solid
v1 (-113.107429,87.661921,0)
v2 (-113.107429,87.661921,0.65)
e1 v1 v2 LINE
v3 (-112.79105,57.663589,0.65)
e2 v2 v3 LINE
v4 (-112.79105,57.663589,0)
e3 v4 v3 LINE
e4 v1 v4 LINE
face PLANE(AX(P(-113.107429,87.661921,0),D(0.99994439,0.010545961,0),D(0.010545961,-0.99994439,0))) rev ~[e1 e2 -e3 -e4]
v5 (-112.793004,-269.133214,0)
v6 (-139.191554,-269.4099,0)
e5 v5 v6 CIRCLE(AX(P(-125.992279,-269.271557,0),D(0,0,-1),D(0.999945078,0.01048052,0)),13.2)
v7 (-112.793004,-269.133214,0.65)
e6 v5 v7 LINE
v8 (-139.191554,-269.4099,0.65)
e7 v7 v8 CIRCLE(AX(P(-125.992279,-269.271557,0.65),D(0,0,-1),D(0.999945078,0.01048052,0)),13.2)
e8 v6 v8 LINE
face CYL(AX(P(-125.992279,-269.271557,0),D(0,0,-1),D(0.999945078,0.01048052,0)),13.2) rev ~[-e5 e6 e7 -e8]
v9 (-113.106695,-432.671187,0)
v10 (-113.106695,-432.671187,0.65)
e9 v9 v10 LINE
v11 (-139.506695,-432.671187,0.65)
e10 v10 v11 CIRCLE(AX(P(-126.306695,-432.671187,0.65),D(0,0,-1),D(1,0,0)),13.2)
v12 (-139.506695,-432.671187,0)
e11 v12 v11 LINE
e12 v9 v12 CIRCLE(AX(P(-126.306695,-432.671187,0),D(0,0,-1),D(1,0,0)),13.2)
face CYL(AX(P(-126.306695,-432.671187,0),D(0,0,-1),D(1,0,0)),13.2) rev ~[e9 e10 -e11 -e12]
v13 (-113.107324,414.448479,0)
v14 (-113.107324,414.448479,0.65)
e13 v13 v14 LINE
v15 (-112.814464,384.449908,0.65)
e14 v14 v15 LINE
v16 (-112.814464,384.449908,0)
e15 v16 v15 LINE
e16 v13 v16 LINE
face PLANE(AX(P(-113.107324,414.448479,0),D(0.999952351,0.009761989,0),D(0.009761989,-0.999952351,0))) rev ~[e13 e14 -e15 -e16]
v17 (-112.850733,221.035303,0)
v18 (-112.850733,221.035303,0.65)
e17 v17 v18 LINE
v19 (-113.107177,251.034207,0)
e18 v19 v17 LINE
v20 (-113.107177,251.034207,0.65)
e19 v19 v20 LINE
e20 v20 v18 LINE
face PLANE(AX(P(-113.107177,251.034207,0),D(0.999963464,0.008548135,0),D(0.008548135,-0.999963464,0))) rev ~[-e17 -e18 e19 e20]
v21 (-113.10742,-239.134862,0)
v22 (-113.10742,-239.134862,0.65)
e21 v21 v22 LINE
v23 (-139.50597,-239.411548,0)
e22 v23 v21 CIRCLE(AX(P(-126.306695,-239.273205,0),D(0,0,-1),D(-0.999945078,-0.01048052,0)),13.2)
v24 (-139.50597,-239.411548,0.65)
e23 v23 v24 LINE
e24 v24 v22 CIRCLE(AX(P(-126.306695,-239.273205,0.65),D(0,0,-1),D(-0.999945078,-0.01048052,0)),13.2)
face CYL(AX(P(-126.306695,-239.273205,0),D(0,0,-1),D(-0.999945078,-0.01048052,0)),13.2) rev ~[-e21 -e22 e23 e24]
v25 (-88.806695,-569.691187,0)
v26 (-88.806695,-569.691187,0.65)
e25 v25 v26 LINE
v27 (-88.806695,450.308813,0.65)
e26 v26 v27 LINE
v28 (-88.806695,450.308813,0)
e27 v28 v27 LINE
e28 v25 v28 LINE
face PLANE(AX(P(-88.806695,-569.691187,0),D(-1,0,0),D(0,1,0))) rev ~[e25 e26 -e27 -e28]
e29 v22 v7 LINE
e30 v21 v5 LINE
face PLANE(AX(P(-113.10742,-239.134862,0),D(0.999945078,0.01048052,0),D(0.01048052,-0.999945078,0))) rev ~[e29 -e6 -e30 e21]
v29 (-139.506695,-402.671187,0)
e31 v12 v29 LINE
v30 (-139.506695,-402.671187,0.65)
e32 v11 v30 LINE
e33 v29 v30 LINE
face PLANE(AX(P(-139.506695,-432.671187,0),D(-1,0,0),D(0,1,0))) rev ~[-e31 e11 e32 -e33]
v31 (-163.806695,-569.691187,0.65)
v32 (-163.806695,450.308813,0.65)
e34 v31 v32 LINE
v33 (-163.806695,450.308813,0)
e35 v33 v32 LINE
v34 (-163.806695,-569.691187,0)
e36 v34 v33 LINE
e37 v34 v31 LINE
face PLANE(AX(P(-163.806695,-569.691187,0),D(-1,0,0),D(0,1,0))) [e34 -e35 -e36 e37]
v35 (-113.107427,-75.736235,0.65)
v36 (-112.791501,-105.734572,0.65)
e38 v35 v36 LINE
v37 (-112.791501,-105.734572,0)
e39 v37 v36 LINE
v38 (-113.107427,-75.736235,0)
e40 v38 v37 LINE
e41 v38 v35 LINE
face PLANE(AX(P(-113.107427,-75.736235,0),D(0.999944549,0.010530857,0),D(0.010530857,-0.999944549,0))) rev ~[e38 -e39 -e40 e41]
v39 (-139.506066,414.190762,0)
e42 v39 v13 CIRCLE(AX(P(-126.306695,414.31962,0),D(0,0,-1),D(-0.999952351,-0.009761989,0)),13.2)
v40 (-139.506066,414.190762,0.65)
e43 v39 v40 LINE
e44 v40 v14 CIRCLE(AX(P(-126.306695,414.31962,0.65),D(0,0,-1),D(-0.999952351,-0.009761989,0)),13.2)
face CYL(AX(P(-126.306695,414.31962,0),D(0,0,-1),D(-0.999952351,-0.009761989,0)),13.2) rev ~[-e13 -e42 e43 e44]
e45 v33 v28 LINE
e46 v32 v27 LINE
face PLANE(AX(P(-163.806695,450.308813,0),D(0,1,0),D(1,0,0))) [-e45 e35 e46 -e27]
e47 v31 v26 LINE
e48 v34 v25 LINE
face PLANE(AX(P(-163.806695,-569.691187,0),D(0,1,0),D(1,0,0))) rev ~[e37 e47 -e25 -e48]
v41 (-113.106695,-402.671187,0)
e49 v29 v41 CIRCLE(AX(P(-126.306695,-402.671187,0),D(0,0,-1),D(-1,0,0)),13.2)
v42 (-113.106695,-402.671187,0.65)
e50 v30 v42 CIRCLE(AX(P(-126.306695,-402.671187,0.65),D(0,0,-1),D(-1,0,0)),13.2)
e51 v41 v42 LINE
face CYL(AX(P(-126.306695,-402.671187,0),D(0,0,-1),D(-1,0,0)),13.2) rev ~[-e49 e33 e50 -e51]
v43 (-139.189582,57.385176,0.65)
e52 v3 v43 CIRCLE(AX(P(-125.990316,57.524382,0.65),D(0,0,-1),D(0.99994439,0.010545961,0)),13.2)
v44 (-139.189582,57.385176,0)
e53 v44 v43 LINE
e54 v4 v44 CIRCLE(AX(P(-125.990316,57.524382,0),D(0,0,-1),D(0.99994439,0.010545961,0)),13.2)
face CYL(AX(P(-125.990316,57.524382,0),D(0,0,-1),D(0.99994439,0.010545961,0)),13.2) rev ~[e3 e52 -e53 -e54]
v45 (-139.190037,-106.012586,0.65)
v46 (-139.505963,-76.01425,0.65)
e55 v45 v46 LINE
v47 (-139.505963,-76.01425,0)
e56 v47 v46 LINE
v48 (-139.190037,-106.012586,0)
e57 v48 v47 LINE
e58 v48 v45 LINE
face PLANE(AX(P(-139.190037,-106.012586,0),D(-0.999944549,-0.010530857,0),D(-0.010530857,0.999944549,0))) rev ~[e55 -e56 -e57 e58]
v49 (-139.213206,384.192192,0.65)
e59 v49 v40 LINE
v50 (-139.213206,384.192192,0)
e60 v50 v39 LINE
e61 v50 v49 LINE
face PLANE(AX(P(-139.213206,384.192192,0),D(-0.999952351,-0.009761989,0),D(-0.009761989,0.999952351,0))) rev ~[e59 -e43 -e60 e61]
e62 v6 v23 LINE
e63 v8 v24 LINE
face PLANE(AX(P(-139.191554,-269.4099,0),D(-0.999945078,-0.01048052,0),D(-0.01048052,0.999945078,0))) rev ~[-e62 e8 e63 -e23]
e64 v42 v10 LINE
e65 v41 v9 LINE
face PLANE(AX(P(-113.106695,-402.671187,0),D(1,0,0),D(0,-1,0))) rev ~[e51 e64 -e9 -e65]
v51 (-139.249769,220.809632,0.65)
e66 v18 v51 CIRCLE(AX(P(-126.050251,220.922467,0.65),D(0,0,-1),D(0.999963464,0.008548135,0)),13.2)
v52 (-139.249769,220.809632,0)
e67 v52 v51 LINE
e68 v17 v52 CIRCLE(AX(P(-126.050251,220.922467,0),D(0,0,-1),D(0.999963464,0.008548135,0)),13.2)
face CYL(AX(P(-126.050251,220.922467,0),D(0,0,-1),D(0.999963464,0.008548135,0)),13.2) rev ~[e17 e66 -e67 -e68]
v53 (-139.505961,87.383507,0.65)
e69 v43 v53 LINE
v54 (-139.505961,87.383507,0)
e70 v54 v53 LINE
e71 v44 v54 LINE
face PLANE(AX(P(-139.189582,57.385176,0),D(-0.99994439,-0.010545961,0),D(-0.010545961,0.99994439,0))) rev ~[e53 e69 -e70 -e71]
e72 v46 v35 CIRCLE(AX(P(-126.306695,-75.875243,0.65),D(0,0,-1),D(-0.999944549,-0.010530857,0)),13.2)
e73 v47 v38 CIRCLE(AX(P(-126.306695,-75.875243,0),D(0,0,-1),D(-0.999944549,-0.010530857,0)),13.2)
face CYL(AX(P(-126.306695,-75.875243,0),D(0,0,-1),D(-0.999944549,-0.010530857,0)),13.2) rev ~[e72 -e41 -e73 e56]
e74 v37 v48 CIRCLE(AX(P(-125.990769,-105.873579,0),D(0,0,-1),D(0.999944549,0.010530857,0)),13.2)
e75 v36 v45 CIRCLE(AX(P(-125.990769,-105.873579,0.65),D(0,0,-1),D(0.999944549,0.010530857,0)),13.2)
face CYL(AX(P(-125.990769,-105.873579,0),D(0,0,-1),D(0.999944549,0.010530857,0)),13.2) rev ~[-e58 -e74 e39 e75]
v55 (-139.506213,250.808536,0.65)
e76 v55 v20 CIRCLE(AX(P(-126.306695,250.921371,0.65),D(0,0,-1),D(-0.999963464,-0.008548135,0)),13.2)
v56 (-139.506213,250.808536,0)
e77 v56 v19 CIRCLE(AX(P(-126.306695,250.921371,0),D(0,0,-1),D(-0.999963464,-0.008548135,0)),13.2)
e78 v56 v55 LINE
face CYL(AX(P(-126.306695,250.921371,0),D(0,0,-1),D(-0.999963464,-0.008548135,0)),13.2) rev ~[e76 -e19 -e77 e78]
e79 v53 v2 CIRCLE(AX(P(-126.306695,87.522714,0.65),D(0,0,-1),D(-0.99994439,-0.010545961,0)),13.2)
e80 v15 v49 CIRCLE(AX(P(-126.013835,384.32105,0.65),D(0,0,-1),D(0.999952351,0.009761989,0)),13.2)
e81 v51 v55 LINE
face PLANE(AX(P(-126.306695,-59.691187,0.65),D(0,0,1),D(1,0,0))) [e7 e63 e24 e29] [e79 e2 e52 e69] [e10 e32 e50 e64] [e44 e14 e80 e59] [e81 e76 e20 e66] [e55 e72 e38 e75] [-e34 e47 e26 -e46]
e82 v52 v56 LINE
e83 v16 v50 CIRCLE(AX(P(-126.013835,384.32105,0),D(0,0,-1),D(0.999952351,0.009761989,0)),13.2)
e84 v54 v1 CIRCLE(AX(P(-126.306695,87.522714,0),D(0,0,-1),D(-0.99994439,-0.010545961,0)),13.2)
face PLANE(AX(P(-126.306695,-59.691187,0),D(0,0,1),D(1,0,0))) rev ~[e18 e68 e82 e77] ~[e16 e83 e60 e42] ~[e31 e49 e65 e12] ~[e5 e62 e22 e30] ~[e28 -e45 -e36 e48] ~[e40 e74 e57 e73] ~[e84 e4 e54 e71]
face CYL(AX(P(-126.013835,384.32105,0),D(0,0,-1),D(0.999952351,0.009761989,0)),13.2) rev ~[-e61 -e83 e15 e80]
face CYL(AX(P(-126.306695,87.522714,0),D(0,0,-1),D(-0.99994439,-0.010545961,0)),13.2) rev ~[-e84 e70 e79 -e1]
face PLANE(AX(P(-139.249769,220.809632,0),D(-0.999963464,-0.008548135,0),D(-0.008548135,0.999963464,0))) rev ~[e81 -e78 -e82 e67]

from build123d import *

# Parameters (mm, degrees)
F0_W     = 75
F0_H     = 1020
F1_DEPTH = 0.65


# Not quite as in the source:
# - ends of sketch curves that miss each other by under 0.0002 mm in the source are joined


with BuildPart() as f1:
    # F0 (on Top) → F1 (new body)
    with BuildSketch(Plane.XY):
        with Locations((-126.3066948975, -59.6911867905)):
            Rectangle(F0_W, F0_H)
        with BuildLine():
            ThreePointArc((-113.1066948975, -432.6711867905), (-126.3066948975, -445.8711867905), (-139.5066948975, -432.6711867905))
            Line((-139.5066948975, -432.6711867905), (-139.5066948975, -402.6711867905))
            ThreePointArc((-139.5066948975, -402.6711867905), (-126.3066948975, -389.4711867905), (-113.1066948975, -402.6711867905))
            Line((-113.1066948975, -402.6711867905), (-113.1066948975, -432.6711867905))
        make_face(mode=Mode.SUBTRACT)
        with BuildLine():
            ThreePointArc((-139.5059699251, -239.411547845), (-126.4450377578, -226.0739299572), (-113.10741987, -239.1348621245))
            Line((-113.10741987, -239.1348621245), (-112.7930042784, -269.1332144598))
            ThreePointArc((-112.7930042784, -269.1332144598), (-125.8539364457, -282.4708323476), (-139.1915543335, -269.4099001804))
            Line((-139.1915543335, -269.4099001804), (-139.5059699251, -239.411547845))
        make_face(mode=Mode.SUBTRACT)
        with BuildLine():
            ThreePointArc((-139.5059629442, -76.0142499203), (-126.4457022055, -62.6759745657), (-113.1074268508, -75.7362353044))
            Line((-113.1074268508, -75.7362353044), (-112.7915011509, -105.7345717742))
            ThreePointArc((-112.7915011509, -105.7345717742), (-125.8517618897, -119.0728471288), (-139.1900372443, -106.0125863901))
            Line((-139.1900372443, -106.0125863901), (-139.5059629442, -76.0142499203))
        make_face(mode=Mode.SUBTRACT)
        with BuildLine():
            ThreePointArc((-139.505960843, 87.3835072291), (-126.4459015791, 100.7219798561), (-113.107428952, 87.6619205922))
            Line((-113.107428952, 87.6619205922), (-112.7910501303, 57.6635888979))
            ThreePointArc((-112.7910501303, 57.6635888979), (-125.8511093943, 44.3251162708), (-139.1895820213, 57.3851755348))
            Line((-139.1895820213, 57.3851755348), (-139.505960843, 87.3835072291))
        make_face(mode=Mode.SUBTRACT)
        with BuildLine():
            ThreePointArc((-139.5062126227, 250.8085359622), (-126.4195302765, 264.1208890664), (-113.1071771723, 251.0342067202))
            Line((-113.1071771723, 251.0342067202), (-112.8507331291, 221.0353027993))
            ThreePointArc((-112.8507331291, 221.0353027993), (-125.9374154753, 207.7229496952), (-139.2497685795, 220.8096320413))
            Line((-139.2497685795, 220.8096320413), (-139.5062126227, 250.8085359622))
        make_face(mode=Mode.SUBTRACT)
        with BuildLine():
            ThreePointArc((-139.5060659261, 414.1907621397), (-126.4355531533, 427.5189914241), (-113.1073238689, 414.4484786514))
            Line((-113.1073238689, 414.4484786514), (-112.8144641966, 384.4499081319))
            ThreePointArc((-112.8144641966, 384.4499081319), (-125.8849769693, 371.1216788475), (-139.2132062537, 384.1921916203))
            Line((-139.2132062537, 384.1921916203), (-139.5060659261, 414.1907621397))
        make_face(mode=Mode.SUBTRACT)
    extrude(amount=F1_DEPTH)


solid = f1.part
